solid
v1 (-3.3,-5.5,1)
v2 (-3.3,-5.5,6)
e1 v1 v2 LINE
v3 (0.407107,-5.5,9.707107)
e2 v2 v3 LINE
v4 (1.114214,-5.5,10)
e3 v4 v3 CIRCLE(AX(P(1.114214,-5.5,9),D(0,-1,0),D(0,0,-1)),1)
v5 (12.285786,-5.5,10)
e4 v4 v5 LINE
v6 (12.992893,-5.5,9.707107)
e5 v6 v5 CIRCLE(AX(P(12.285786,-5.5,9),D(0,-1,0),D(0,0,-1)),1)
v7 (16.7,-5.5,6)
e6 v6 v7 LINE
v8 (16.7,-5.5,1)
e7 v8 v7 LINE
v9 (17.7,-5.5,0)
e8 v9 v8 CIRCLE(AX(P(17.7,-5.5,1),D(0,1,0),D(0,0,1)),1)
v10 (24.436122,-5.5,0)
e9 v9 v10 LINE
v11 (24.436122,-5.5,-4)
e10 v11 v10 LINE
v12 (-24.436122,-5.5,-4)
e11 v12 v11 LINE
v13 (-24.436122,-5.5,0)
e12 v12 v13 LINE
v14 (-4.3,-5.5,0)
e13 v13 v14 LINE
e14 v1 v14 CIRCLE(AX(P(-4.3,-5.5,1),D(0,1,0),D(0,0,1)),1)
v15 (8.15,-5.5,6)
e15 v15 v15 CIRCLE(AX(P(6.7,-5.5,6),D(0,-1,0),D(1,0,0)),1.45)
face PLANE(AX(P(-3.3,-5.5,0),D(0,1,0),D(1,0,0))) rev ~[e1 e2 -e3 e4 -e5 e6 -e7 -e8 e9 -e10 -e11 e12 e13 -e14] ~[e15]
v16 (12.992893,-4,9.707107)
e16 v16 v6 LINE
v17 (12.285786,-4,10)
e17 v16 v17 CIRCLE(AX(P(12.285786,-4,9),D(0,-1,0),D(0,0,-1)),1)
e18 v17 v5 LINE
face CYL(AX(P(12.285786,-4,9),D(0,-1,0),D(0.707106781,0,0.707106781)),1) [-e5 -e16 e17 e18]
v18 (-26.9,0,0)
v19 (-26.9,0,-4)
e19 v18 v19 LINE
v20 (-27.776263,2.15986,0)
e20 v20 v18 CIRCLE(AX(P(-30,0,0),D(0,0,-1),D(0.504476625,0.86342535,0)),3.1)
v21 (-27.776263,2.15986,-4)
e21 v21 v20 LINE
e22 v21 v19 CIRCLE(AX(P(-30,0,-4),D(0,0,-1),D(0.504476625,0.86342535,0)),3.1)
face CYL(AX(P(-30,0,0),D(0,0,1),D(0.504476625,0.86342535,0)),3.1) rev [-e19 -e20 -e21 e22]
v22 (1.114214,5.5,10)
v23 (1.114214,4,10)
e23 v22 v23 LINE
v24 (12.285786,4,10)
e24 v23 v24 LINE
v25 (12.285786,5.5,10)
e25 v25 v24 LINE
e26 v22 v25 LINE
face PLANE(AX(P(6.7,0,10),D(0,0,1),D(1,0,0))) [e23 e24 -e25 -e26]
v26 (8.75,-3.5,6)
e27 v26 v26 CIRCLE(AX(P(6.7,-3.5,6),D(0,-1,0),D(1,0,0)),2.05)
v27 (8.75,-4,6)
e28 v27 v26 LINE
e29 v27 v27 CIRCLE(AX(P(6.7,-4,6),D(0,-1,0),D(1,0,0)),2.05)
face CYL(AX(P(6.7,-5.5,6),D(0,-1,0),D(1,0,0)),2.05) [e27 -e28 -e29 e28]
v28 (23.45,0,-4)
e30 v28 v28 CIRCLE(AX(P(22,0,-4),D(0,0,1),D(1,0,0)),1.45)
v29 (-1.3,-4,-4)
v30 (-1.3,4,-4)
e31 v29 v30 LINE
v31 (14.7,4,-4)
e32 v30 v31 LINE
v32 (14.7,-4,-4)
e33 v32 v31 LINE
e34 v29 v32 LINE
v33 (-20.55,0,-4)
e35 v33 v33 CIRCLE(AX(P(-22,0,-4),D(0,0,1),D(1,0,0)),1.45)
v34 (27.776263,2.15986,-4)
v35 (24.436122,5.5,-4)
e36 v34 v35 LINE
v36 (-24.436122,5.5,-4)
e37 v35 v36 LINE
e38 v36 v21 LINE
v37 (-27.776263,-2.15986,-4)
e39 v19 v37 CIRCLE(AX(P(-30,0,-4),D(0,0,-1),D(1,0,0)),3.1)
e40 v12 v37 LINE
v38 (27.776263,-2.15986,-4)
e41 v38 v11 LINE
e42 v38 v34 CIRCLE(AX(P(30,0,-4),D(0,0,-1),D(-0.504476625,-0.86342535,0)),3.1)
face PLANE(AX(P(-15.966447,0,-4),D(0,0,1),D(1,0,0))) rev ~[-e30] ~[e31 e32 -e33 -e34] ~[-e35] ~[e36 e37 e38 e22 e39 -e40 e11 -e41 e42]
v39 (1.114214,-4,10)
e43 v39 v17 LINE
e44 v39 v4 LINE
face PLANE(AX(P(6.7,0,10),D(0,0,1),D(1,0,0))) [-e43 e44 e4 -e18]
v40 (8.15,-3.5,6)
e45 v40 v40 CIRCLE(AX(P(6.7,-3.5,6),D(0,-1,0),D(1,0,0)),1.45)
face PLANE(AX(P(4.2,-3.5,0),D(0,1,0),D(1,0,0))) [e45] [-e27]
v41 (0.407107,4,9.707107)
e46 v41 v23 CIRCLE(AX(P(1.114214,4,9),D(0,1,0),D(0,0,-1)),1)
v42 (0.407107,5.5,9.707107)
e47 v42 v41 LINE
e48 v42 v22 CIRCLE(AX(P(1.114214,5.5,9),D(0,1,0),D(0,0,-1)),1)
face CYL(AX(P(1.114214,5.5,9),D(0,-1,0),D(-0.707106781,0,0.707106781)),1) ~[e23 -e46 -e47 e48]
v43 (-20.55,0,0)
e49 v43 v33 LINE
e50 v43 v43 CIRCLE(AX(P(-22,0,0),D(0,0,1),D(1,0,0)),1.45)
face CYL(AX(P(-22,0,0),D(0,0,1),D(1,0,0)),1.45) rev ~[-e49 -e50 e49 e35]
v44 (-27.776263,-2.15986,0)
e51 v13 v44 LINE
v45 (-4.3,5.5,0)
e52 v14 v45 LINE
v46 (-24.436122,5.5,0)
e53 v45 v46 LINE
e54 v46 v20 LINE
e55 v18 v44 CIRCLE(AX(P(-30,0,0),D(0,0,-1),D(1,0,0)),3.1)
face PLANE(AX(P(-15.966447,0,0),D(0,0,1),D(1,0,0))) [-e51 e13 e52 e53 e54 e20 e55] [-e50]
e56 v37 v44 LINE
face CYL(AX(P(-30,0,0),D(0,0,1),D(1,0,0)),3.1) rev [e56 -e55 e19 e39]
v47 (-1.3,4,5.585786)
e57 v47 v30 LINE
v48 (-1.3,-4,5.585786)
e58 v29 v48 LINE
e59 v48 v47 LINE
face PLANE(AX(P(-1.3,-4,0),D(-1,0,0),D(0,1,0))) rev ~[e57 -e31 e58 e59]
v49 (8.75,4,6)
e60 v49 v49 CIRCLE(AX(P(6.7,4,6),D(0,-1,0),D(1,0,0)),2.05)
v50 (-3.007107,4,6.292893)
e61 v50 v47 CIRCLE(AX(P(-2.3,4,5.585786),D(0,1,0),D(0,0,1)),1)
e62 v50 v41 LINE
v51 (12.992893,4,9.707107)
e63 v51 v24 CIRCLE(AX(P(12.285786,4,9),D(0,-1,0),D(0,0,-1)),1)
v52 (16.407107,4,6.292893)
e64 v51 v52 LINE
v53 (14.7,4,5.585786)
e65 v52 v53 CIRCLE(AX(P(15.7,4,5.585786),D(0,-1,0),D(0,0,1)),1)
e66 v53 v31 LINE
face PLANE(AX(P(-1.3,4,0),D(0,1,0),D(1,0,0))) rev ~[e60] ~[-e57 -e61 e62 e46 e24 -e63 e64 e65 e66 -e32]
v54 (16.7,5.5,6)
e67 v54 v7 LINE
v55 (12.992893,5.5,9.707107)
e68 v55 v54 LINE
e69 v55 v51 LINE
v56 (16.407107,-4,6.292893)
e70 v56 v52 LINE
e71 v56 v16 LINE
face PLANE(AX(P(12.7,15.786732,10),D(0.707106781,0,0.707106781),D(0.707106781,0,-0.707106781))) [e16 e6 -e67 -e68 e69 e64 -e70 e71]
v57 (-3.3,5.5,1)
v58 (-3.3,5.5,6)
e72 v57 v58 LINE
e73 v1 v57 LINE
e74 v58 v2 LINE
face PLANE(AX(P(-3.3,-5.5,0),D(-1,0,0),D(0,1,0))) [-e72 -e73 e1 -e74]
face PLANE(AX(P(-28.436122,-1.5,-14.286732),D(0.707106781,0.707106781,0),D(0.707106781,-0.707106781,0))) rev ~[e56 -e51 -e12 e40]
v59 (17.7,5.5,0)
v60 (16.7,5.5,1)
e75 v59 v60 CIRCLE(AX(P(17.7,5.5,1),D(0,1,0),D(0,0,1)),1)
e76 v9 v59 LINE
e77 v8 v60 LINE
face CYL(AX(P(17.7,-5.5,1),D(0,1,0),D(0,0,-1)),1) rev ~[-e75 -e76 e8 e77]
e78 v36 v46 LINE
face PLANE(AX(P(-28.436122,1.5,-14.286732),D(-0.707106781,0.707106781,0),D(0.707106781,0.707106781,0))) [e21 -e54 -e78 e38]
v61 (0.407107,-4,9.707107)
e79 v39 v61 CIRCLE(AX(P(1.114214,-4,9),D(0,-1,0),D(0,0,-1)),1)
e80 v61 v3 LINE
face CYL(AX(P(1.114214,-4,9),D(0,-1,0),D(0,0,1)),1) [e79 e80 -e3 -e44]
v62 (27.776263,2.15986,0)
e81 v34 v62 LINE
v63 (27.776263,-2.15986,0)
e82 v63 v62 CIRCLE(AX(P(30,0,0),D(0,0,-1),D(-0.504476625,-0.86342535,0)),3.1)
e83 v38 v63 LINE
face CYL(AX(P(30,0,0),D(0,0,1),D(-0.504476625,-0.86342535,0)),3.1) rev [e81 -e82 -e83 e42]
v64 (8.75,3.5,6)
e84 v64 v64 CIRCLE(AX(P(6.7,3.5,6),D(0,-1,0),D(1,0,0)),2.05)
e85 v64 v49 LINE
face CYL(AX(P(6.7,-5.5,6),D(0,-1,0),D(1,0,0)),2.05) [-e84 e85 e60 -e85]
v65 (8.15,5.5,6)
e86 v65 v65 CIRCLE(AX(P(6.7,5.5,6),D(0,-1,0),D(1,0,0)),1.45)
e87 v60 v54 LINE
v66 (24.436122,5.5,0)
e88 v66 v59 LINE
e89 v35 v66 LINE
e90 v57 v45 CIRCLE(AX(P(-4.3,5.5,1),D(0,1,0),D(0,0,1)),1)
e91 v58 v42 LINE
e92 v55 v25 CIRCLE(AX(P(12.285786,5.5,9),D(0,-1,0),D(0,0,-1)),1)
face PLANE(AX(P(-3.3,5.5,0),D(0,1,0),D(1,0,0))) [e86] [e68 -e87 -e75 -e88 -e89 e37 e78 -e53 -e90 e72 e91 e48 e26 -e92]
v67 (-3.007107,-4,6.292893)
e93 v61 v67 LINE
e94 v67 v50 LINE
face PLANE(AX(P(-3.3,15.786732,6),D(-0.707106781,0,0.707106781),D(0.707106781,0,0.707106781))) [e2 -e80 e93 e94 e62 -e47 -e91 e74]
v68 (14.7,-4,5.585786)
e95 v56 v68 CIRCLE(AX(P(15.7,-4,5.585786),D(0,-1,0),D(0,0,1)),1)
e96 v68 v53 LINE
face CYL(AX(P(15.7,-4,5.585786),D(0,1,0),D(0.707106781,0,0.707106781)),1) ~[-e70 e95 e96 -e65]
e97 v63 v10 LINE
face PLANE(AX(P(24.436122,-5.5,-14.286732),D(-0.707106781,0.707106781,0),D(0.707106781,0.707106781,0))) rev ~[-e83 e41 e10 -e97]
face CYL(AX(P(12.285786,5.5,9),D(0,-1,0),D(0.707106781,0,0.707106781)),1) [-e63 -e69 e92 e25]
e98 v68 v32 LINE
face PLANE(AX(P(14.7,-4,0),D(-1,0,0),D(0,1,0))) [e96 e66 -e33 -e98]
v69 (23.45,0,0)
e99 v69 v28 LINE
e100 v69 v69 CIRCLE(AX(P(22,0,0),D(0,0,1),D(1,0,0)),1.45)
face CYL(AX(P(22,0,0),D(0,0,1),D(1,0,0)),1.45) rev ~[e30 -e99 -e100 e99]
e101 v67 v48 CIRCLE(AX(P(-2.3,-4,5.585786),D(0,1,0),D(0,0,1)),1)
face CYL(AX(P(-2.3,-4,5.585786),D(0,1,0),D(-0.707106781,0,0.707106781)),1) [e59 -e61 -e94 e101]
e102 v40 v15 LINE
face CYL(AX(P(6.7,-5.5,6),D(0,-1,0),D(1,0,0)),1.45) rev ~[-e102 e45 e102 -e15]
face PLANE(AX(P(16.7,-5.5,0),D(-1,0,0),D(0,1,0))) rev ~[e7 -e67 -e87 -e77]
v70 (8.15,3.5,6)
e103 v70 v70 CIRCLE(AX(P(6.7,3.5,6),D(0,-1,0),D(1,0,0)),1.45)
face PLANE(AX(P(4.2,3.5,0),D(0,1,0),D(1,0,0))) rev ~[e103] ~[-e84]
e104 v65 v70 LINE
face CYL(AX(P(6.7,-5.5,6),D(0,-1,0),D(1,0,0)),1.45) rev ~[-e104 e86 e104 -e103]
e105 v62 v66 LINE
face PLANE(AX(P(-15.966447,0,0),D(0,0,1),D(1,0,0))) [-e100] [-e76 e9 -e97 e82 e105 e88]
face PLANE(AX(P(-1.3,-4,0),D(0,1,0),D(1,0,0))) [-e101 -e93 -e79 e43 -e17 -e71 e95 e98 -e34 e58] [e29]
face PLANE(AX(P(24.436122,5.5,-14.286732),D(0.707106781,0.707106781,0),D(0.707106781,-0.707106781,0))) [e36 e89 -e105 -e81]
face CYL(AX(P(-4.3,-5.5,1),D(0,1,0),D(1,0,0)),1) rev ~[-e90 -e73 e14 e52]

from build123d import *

# Parameters (mm, degrees)
F0_R        = 1.45
F0_W        = 20
F0_H        = 11
F0_W_2      = 16
F0_H_2      = 8
F1_DEPTH    = 4
F2_DEPTH    = 10
F3_R        = 1.45
F4_DEPTH    = 25
F3_R_2      = 2.05
F5_DEPTH    = 11
F0_W_3      = 5
F0_H_3      = 7
F6_DEPTH    = 25
F7_T1_DEPTH = 31.5734639037
F7_T3_DEPTH = 24.5734639037
F8_R        = 1


# Not quite as in the source:
# - a fillet or chamfer that OpenCascade refuses, or shapes differently, is made with other operations: its cross-section is extruded or revolved along the edge and cut away or added


with BuildPart() as f1:
    # F0 (on Top) → F1 (new body)
    with BuildSketch(Plane.XY):
        with BuildLine():
            ThreePointArc((-28.4361224622, 2.6766185844), (-27.3113181327, 1.54304563), (-26.9, 0))
            ThreePointArc((-26.9, 0), (-27.3113181327, -1.54304563), (-28.4361224622, -2.6766185844))
            Line((-28.4361224622, -2.6766185844), (-28.4361224622, -5.5))
            Line((-28.4361224622, -5.5), (-3.3, -5.5))
            Line((-3.3, -5.5), (-3.3, 5.5))
            Line((-3.3, 5.5), (-28.4361224622, 5.5))
            Line((-28.4361224622, 5.5), (-28.4361224622, 2.6766185844))
        make_face()
        with Locations((-22, 0)):
            Circle(F0_R, mode=Mode.SUBTRACT)
        with BuildLine():
            Line((28.4361224622, 5.5), (16.7, 5.5))
            Line((16.7, 5.5), (16.7, -5.5))
            Line((16.7, -5.5), (28.4361224622, -5.5))
            Line((28.4361224622, -5.5), (28.4361224622, -2.6766185844))
            ThreePointArc((28.4361224622, -2.6766185844), (26.9, 0), (28.4361224622, 2.6766185844))
            Line((28.4361224622, 2.6766185844), (28.4361224622, 5.5))
        make_face()
        with Locations((22, 0)):
            Circle(F0_R, mode=Mode.SUBTRACT)
        with Locations((6.7, 0)):
            Rectangle(F0_W, F0_H)
        with Locations((6.7, 0)):
            Rectangle(F0_W_2, F0_H_2, mode=Mode.SUBTRACT)
    extrude(amount=-F1_DEPTH)

    # F0 (on Top) → F2 (join)
    with BuildSketch(Plane.XY):
        with Locations((6.7, 0)):
            Rectangle(F0_W, F0_H)
        with Locations((6.7, 0)):
            Rectangle(F0_W_2, F0_H_2, mode=Mode.SUBTRACT)
    extrude(amount=F2_DEPTH)

    # F3 (on face) → F4 (cut)
    with BuildSketch(Plane.XZ.offset(5.5)):
        with Locations((6.7, 6)):
            Circle(F3_R)
    extrude(amount=-F4_DEPTH, mode=Mode.SUBTRACT)

    # F3 (on face) → F5 (join, through all)
    with BuildSketch(Plane.XZ.offset(5.5)):
        with Locations((6.7, 6)):
            Circle(F3_R_2)
        with Locations((6.7, 6)):
            Circle(F3_R, mode=Mode.SUBTRACT)
    extrude(amount=-F5_DEPTH)

    # F0 (on Top) → F6 (cut)
    with BuildSketch(Plane.XY):
        with Locations((6.7, 0)):
            Rectangle(F0_W_3, F0_H_3)
    extrude(amount=F6_DEPTH, mode=Mode.SUBTRACT)

    # F7: chamfer of 4 on 6 edges, made by hand

    # F7_s2 → F7_t1 (cut)
    with BuildSketch(Plane.XZ.offset(-15.7867319519)):
        Polygon((-3.3, 6), (0.7, 10), (-3.3, 10), align=None)
        Polygon((12.7, 10), (16.7, 6), (16.7, 10), align=None)
    extrude(amount=F7_T1_DEPTH, mode=Mode.SUBTRACT)

    # F7_s4 → F7_t3 (cut)
    with BuildSketch(Plane.XY.offset(-14.2867319519)):
        Polygon((-28.4361224622, -1.5), (-24.4361224622, -5.5), (-28.4361224622, -5.5), align=None)
        Polygon((-28.4361224622, 1.5), (-24.4361224622, 5.5), (-28.4361224622, 5.5), align=None)
        Polygon((24.4361224622, -5.5), (28.4361224622, -1.5), (28.4361224622, -5.5), align=None)
        Polygon((24.4361224622, 5.5), (28.4361224622, 1.5), (28.4361224622, 5.5), align=None)
    extrude(amount=F7_T3_DEPTH, mode=Mode.SUBTRACT)

    # F8
    f8_edges = [f1.edges().sort_by_distance(p)[0] for p in [
        (-1.3, 0, 8),
        (14.7, 0, 8),
        (0.7, 4.75, 10),
        (0.7, -4.75, 10),
        (12.7, -4.75, 10),
        (12.7, 4.75, 10),
        (-3.3, 0, 0),
        (16.7, 0, 0),
    ]]
    fillet(f8_edges, radius=F8_R)


solid = f1.part
